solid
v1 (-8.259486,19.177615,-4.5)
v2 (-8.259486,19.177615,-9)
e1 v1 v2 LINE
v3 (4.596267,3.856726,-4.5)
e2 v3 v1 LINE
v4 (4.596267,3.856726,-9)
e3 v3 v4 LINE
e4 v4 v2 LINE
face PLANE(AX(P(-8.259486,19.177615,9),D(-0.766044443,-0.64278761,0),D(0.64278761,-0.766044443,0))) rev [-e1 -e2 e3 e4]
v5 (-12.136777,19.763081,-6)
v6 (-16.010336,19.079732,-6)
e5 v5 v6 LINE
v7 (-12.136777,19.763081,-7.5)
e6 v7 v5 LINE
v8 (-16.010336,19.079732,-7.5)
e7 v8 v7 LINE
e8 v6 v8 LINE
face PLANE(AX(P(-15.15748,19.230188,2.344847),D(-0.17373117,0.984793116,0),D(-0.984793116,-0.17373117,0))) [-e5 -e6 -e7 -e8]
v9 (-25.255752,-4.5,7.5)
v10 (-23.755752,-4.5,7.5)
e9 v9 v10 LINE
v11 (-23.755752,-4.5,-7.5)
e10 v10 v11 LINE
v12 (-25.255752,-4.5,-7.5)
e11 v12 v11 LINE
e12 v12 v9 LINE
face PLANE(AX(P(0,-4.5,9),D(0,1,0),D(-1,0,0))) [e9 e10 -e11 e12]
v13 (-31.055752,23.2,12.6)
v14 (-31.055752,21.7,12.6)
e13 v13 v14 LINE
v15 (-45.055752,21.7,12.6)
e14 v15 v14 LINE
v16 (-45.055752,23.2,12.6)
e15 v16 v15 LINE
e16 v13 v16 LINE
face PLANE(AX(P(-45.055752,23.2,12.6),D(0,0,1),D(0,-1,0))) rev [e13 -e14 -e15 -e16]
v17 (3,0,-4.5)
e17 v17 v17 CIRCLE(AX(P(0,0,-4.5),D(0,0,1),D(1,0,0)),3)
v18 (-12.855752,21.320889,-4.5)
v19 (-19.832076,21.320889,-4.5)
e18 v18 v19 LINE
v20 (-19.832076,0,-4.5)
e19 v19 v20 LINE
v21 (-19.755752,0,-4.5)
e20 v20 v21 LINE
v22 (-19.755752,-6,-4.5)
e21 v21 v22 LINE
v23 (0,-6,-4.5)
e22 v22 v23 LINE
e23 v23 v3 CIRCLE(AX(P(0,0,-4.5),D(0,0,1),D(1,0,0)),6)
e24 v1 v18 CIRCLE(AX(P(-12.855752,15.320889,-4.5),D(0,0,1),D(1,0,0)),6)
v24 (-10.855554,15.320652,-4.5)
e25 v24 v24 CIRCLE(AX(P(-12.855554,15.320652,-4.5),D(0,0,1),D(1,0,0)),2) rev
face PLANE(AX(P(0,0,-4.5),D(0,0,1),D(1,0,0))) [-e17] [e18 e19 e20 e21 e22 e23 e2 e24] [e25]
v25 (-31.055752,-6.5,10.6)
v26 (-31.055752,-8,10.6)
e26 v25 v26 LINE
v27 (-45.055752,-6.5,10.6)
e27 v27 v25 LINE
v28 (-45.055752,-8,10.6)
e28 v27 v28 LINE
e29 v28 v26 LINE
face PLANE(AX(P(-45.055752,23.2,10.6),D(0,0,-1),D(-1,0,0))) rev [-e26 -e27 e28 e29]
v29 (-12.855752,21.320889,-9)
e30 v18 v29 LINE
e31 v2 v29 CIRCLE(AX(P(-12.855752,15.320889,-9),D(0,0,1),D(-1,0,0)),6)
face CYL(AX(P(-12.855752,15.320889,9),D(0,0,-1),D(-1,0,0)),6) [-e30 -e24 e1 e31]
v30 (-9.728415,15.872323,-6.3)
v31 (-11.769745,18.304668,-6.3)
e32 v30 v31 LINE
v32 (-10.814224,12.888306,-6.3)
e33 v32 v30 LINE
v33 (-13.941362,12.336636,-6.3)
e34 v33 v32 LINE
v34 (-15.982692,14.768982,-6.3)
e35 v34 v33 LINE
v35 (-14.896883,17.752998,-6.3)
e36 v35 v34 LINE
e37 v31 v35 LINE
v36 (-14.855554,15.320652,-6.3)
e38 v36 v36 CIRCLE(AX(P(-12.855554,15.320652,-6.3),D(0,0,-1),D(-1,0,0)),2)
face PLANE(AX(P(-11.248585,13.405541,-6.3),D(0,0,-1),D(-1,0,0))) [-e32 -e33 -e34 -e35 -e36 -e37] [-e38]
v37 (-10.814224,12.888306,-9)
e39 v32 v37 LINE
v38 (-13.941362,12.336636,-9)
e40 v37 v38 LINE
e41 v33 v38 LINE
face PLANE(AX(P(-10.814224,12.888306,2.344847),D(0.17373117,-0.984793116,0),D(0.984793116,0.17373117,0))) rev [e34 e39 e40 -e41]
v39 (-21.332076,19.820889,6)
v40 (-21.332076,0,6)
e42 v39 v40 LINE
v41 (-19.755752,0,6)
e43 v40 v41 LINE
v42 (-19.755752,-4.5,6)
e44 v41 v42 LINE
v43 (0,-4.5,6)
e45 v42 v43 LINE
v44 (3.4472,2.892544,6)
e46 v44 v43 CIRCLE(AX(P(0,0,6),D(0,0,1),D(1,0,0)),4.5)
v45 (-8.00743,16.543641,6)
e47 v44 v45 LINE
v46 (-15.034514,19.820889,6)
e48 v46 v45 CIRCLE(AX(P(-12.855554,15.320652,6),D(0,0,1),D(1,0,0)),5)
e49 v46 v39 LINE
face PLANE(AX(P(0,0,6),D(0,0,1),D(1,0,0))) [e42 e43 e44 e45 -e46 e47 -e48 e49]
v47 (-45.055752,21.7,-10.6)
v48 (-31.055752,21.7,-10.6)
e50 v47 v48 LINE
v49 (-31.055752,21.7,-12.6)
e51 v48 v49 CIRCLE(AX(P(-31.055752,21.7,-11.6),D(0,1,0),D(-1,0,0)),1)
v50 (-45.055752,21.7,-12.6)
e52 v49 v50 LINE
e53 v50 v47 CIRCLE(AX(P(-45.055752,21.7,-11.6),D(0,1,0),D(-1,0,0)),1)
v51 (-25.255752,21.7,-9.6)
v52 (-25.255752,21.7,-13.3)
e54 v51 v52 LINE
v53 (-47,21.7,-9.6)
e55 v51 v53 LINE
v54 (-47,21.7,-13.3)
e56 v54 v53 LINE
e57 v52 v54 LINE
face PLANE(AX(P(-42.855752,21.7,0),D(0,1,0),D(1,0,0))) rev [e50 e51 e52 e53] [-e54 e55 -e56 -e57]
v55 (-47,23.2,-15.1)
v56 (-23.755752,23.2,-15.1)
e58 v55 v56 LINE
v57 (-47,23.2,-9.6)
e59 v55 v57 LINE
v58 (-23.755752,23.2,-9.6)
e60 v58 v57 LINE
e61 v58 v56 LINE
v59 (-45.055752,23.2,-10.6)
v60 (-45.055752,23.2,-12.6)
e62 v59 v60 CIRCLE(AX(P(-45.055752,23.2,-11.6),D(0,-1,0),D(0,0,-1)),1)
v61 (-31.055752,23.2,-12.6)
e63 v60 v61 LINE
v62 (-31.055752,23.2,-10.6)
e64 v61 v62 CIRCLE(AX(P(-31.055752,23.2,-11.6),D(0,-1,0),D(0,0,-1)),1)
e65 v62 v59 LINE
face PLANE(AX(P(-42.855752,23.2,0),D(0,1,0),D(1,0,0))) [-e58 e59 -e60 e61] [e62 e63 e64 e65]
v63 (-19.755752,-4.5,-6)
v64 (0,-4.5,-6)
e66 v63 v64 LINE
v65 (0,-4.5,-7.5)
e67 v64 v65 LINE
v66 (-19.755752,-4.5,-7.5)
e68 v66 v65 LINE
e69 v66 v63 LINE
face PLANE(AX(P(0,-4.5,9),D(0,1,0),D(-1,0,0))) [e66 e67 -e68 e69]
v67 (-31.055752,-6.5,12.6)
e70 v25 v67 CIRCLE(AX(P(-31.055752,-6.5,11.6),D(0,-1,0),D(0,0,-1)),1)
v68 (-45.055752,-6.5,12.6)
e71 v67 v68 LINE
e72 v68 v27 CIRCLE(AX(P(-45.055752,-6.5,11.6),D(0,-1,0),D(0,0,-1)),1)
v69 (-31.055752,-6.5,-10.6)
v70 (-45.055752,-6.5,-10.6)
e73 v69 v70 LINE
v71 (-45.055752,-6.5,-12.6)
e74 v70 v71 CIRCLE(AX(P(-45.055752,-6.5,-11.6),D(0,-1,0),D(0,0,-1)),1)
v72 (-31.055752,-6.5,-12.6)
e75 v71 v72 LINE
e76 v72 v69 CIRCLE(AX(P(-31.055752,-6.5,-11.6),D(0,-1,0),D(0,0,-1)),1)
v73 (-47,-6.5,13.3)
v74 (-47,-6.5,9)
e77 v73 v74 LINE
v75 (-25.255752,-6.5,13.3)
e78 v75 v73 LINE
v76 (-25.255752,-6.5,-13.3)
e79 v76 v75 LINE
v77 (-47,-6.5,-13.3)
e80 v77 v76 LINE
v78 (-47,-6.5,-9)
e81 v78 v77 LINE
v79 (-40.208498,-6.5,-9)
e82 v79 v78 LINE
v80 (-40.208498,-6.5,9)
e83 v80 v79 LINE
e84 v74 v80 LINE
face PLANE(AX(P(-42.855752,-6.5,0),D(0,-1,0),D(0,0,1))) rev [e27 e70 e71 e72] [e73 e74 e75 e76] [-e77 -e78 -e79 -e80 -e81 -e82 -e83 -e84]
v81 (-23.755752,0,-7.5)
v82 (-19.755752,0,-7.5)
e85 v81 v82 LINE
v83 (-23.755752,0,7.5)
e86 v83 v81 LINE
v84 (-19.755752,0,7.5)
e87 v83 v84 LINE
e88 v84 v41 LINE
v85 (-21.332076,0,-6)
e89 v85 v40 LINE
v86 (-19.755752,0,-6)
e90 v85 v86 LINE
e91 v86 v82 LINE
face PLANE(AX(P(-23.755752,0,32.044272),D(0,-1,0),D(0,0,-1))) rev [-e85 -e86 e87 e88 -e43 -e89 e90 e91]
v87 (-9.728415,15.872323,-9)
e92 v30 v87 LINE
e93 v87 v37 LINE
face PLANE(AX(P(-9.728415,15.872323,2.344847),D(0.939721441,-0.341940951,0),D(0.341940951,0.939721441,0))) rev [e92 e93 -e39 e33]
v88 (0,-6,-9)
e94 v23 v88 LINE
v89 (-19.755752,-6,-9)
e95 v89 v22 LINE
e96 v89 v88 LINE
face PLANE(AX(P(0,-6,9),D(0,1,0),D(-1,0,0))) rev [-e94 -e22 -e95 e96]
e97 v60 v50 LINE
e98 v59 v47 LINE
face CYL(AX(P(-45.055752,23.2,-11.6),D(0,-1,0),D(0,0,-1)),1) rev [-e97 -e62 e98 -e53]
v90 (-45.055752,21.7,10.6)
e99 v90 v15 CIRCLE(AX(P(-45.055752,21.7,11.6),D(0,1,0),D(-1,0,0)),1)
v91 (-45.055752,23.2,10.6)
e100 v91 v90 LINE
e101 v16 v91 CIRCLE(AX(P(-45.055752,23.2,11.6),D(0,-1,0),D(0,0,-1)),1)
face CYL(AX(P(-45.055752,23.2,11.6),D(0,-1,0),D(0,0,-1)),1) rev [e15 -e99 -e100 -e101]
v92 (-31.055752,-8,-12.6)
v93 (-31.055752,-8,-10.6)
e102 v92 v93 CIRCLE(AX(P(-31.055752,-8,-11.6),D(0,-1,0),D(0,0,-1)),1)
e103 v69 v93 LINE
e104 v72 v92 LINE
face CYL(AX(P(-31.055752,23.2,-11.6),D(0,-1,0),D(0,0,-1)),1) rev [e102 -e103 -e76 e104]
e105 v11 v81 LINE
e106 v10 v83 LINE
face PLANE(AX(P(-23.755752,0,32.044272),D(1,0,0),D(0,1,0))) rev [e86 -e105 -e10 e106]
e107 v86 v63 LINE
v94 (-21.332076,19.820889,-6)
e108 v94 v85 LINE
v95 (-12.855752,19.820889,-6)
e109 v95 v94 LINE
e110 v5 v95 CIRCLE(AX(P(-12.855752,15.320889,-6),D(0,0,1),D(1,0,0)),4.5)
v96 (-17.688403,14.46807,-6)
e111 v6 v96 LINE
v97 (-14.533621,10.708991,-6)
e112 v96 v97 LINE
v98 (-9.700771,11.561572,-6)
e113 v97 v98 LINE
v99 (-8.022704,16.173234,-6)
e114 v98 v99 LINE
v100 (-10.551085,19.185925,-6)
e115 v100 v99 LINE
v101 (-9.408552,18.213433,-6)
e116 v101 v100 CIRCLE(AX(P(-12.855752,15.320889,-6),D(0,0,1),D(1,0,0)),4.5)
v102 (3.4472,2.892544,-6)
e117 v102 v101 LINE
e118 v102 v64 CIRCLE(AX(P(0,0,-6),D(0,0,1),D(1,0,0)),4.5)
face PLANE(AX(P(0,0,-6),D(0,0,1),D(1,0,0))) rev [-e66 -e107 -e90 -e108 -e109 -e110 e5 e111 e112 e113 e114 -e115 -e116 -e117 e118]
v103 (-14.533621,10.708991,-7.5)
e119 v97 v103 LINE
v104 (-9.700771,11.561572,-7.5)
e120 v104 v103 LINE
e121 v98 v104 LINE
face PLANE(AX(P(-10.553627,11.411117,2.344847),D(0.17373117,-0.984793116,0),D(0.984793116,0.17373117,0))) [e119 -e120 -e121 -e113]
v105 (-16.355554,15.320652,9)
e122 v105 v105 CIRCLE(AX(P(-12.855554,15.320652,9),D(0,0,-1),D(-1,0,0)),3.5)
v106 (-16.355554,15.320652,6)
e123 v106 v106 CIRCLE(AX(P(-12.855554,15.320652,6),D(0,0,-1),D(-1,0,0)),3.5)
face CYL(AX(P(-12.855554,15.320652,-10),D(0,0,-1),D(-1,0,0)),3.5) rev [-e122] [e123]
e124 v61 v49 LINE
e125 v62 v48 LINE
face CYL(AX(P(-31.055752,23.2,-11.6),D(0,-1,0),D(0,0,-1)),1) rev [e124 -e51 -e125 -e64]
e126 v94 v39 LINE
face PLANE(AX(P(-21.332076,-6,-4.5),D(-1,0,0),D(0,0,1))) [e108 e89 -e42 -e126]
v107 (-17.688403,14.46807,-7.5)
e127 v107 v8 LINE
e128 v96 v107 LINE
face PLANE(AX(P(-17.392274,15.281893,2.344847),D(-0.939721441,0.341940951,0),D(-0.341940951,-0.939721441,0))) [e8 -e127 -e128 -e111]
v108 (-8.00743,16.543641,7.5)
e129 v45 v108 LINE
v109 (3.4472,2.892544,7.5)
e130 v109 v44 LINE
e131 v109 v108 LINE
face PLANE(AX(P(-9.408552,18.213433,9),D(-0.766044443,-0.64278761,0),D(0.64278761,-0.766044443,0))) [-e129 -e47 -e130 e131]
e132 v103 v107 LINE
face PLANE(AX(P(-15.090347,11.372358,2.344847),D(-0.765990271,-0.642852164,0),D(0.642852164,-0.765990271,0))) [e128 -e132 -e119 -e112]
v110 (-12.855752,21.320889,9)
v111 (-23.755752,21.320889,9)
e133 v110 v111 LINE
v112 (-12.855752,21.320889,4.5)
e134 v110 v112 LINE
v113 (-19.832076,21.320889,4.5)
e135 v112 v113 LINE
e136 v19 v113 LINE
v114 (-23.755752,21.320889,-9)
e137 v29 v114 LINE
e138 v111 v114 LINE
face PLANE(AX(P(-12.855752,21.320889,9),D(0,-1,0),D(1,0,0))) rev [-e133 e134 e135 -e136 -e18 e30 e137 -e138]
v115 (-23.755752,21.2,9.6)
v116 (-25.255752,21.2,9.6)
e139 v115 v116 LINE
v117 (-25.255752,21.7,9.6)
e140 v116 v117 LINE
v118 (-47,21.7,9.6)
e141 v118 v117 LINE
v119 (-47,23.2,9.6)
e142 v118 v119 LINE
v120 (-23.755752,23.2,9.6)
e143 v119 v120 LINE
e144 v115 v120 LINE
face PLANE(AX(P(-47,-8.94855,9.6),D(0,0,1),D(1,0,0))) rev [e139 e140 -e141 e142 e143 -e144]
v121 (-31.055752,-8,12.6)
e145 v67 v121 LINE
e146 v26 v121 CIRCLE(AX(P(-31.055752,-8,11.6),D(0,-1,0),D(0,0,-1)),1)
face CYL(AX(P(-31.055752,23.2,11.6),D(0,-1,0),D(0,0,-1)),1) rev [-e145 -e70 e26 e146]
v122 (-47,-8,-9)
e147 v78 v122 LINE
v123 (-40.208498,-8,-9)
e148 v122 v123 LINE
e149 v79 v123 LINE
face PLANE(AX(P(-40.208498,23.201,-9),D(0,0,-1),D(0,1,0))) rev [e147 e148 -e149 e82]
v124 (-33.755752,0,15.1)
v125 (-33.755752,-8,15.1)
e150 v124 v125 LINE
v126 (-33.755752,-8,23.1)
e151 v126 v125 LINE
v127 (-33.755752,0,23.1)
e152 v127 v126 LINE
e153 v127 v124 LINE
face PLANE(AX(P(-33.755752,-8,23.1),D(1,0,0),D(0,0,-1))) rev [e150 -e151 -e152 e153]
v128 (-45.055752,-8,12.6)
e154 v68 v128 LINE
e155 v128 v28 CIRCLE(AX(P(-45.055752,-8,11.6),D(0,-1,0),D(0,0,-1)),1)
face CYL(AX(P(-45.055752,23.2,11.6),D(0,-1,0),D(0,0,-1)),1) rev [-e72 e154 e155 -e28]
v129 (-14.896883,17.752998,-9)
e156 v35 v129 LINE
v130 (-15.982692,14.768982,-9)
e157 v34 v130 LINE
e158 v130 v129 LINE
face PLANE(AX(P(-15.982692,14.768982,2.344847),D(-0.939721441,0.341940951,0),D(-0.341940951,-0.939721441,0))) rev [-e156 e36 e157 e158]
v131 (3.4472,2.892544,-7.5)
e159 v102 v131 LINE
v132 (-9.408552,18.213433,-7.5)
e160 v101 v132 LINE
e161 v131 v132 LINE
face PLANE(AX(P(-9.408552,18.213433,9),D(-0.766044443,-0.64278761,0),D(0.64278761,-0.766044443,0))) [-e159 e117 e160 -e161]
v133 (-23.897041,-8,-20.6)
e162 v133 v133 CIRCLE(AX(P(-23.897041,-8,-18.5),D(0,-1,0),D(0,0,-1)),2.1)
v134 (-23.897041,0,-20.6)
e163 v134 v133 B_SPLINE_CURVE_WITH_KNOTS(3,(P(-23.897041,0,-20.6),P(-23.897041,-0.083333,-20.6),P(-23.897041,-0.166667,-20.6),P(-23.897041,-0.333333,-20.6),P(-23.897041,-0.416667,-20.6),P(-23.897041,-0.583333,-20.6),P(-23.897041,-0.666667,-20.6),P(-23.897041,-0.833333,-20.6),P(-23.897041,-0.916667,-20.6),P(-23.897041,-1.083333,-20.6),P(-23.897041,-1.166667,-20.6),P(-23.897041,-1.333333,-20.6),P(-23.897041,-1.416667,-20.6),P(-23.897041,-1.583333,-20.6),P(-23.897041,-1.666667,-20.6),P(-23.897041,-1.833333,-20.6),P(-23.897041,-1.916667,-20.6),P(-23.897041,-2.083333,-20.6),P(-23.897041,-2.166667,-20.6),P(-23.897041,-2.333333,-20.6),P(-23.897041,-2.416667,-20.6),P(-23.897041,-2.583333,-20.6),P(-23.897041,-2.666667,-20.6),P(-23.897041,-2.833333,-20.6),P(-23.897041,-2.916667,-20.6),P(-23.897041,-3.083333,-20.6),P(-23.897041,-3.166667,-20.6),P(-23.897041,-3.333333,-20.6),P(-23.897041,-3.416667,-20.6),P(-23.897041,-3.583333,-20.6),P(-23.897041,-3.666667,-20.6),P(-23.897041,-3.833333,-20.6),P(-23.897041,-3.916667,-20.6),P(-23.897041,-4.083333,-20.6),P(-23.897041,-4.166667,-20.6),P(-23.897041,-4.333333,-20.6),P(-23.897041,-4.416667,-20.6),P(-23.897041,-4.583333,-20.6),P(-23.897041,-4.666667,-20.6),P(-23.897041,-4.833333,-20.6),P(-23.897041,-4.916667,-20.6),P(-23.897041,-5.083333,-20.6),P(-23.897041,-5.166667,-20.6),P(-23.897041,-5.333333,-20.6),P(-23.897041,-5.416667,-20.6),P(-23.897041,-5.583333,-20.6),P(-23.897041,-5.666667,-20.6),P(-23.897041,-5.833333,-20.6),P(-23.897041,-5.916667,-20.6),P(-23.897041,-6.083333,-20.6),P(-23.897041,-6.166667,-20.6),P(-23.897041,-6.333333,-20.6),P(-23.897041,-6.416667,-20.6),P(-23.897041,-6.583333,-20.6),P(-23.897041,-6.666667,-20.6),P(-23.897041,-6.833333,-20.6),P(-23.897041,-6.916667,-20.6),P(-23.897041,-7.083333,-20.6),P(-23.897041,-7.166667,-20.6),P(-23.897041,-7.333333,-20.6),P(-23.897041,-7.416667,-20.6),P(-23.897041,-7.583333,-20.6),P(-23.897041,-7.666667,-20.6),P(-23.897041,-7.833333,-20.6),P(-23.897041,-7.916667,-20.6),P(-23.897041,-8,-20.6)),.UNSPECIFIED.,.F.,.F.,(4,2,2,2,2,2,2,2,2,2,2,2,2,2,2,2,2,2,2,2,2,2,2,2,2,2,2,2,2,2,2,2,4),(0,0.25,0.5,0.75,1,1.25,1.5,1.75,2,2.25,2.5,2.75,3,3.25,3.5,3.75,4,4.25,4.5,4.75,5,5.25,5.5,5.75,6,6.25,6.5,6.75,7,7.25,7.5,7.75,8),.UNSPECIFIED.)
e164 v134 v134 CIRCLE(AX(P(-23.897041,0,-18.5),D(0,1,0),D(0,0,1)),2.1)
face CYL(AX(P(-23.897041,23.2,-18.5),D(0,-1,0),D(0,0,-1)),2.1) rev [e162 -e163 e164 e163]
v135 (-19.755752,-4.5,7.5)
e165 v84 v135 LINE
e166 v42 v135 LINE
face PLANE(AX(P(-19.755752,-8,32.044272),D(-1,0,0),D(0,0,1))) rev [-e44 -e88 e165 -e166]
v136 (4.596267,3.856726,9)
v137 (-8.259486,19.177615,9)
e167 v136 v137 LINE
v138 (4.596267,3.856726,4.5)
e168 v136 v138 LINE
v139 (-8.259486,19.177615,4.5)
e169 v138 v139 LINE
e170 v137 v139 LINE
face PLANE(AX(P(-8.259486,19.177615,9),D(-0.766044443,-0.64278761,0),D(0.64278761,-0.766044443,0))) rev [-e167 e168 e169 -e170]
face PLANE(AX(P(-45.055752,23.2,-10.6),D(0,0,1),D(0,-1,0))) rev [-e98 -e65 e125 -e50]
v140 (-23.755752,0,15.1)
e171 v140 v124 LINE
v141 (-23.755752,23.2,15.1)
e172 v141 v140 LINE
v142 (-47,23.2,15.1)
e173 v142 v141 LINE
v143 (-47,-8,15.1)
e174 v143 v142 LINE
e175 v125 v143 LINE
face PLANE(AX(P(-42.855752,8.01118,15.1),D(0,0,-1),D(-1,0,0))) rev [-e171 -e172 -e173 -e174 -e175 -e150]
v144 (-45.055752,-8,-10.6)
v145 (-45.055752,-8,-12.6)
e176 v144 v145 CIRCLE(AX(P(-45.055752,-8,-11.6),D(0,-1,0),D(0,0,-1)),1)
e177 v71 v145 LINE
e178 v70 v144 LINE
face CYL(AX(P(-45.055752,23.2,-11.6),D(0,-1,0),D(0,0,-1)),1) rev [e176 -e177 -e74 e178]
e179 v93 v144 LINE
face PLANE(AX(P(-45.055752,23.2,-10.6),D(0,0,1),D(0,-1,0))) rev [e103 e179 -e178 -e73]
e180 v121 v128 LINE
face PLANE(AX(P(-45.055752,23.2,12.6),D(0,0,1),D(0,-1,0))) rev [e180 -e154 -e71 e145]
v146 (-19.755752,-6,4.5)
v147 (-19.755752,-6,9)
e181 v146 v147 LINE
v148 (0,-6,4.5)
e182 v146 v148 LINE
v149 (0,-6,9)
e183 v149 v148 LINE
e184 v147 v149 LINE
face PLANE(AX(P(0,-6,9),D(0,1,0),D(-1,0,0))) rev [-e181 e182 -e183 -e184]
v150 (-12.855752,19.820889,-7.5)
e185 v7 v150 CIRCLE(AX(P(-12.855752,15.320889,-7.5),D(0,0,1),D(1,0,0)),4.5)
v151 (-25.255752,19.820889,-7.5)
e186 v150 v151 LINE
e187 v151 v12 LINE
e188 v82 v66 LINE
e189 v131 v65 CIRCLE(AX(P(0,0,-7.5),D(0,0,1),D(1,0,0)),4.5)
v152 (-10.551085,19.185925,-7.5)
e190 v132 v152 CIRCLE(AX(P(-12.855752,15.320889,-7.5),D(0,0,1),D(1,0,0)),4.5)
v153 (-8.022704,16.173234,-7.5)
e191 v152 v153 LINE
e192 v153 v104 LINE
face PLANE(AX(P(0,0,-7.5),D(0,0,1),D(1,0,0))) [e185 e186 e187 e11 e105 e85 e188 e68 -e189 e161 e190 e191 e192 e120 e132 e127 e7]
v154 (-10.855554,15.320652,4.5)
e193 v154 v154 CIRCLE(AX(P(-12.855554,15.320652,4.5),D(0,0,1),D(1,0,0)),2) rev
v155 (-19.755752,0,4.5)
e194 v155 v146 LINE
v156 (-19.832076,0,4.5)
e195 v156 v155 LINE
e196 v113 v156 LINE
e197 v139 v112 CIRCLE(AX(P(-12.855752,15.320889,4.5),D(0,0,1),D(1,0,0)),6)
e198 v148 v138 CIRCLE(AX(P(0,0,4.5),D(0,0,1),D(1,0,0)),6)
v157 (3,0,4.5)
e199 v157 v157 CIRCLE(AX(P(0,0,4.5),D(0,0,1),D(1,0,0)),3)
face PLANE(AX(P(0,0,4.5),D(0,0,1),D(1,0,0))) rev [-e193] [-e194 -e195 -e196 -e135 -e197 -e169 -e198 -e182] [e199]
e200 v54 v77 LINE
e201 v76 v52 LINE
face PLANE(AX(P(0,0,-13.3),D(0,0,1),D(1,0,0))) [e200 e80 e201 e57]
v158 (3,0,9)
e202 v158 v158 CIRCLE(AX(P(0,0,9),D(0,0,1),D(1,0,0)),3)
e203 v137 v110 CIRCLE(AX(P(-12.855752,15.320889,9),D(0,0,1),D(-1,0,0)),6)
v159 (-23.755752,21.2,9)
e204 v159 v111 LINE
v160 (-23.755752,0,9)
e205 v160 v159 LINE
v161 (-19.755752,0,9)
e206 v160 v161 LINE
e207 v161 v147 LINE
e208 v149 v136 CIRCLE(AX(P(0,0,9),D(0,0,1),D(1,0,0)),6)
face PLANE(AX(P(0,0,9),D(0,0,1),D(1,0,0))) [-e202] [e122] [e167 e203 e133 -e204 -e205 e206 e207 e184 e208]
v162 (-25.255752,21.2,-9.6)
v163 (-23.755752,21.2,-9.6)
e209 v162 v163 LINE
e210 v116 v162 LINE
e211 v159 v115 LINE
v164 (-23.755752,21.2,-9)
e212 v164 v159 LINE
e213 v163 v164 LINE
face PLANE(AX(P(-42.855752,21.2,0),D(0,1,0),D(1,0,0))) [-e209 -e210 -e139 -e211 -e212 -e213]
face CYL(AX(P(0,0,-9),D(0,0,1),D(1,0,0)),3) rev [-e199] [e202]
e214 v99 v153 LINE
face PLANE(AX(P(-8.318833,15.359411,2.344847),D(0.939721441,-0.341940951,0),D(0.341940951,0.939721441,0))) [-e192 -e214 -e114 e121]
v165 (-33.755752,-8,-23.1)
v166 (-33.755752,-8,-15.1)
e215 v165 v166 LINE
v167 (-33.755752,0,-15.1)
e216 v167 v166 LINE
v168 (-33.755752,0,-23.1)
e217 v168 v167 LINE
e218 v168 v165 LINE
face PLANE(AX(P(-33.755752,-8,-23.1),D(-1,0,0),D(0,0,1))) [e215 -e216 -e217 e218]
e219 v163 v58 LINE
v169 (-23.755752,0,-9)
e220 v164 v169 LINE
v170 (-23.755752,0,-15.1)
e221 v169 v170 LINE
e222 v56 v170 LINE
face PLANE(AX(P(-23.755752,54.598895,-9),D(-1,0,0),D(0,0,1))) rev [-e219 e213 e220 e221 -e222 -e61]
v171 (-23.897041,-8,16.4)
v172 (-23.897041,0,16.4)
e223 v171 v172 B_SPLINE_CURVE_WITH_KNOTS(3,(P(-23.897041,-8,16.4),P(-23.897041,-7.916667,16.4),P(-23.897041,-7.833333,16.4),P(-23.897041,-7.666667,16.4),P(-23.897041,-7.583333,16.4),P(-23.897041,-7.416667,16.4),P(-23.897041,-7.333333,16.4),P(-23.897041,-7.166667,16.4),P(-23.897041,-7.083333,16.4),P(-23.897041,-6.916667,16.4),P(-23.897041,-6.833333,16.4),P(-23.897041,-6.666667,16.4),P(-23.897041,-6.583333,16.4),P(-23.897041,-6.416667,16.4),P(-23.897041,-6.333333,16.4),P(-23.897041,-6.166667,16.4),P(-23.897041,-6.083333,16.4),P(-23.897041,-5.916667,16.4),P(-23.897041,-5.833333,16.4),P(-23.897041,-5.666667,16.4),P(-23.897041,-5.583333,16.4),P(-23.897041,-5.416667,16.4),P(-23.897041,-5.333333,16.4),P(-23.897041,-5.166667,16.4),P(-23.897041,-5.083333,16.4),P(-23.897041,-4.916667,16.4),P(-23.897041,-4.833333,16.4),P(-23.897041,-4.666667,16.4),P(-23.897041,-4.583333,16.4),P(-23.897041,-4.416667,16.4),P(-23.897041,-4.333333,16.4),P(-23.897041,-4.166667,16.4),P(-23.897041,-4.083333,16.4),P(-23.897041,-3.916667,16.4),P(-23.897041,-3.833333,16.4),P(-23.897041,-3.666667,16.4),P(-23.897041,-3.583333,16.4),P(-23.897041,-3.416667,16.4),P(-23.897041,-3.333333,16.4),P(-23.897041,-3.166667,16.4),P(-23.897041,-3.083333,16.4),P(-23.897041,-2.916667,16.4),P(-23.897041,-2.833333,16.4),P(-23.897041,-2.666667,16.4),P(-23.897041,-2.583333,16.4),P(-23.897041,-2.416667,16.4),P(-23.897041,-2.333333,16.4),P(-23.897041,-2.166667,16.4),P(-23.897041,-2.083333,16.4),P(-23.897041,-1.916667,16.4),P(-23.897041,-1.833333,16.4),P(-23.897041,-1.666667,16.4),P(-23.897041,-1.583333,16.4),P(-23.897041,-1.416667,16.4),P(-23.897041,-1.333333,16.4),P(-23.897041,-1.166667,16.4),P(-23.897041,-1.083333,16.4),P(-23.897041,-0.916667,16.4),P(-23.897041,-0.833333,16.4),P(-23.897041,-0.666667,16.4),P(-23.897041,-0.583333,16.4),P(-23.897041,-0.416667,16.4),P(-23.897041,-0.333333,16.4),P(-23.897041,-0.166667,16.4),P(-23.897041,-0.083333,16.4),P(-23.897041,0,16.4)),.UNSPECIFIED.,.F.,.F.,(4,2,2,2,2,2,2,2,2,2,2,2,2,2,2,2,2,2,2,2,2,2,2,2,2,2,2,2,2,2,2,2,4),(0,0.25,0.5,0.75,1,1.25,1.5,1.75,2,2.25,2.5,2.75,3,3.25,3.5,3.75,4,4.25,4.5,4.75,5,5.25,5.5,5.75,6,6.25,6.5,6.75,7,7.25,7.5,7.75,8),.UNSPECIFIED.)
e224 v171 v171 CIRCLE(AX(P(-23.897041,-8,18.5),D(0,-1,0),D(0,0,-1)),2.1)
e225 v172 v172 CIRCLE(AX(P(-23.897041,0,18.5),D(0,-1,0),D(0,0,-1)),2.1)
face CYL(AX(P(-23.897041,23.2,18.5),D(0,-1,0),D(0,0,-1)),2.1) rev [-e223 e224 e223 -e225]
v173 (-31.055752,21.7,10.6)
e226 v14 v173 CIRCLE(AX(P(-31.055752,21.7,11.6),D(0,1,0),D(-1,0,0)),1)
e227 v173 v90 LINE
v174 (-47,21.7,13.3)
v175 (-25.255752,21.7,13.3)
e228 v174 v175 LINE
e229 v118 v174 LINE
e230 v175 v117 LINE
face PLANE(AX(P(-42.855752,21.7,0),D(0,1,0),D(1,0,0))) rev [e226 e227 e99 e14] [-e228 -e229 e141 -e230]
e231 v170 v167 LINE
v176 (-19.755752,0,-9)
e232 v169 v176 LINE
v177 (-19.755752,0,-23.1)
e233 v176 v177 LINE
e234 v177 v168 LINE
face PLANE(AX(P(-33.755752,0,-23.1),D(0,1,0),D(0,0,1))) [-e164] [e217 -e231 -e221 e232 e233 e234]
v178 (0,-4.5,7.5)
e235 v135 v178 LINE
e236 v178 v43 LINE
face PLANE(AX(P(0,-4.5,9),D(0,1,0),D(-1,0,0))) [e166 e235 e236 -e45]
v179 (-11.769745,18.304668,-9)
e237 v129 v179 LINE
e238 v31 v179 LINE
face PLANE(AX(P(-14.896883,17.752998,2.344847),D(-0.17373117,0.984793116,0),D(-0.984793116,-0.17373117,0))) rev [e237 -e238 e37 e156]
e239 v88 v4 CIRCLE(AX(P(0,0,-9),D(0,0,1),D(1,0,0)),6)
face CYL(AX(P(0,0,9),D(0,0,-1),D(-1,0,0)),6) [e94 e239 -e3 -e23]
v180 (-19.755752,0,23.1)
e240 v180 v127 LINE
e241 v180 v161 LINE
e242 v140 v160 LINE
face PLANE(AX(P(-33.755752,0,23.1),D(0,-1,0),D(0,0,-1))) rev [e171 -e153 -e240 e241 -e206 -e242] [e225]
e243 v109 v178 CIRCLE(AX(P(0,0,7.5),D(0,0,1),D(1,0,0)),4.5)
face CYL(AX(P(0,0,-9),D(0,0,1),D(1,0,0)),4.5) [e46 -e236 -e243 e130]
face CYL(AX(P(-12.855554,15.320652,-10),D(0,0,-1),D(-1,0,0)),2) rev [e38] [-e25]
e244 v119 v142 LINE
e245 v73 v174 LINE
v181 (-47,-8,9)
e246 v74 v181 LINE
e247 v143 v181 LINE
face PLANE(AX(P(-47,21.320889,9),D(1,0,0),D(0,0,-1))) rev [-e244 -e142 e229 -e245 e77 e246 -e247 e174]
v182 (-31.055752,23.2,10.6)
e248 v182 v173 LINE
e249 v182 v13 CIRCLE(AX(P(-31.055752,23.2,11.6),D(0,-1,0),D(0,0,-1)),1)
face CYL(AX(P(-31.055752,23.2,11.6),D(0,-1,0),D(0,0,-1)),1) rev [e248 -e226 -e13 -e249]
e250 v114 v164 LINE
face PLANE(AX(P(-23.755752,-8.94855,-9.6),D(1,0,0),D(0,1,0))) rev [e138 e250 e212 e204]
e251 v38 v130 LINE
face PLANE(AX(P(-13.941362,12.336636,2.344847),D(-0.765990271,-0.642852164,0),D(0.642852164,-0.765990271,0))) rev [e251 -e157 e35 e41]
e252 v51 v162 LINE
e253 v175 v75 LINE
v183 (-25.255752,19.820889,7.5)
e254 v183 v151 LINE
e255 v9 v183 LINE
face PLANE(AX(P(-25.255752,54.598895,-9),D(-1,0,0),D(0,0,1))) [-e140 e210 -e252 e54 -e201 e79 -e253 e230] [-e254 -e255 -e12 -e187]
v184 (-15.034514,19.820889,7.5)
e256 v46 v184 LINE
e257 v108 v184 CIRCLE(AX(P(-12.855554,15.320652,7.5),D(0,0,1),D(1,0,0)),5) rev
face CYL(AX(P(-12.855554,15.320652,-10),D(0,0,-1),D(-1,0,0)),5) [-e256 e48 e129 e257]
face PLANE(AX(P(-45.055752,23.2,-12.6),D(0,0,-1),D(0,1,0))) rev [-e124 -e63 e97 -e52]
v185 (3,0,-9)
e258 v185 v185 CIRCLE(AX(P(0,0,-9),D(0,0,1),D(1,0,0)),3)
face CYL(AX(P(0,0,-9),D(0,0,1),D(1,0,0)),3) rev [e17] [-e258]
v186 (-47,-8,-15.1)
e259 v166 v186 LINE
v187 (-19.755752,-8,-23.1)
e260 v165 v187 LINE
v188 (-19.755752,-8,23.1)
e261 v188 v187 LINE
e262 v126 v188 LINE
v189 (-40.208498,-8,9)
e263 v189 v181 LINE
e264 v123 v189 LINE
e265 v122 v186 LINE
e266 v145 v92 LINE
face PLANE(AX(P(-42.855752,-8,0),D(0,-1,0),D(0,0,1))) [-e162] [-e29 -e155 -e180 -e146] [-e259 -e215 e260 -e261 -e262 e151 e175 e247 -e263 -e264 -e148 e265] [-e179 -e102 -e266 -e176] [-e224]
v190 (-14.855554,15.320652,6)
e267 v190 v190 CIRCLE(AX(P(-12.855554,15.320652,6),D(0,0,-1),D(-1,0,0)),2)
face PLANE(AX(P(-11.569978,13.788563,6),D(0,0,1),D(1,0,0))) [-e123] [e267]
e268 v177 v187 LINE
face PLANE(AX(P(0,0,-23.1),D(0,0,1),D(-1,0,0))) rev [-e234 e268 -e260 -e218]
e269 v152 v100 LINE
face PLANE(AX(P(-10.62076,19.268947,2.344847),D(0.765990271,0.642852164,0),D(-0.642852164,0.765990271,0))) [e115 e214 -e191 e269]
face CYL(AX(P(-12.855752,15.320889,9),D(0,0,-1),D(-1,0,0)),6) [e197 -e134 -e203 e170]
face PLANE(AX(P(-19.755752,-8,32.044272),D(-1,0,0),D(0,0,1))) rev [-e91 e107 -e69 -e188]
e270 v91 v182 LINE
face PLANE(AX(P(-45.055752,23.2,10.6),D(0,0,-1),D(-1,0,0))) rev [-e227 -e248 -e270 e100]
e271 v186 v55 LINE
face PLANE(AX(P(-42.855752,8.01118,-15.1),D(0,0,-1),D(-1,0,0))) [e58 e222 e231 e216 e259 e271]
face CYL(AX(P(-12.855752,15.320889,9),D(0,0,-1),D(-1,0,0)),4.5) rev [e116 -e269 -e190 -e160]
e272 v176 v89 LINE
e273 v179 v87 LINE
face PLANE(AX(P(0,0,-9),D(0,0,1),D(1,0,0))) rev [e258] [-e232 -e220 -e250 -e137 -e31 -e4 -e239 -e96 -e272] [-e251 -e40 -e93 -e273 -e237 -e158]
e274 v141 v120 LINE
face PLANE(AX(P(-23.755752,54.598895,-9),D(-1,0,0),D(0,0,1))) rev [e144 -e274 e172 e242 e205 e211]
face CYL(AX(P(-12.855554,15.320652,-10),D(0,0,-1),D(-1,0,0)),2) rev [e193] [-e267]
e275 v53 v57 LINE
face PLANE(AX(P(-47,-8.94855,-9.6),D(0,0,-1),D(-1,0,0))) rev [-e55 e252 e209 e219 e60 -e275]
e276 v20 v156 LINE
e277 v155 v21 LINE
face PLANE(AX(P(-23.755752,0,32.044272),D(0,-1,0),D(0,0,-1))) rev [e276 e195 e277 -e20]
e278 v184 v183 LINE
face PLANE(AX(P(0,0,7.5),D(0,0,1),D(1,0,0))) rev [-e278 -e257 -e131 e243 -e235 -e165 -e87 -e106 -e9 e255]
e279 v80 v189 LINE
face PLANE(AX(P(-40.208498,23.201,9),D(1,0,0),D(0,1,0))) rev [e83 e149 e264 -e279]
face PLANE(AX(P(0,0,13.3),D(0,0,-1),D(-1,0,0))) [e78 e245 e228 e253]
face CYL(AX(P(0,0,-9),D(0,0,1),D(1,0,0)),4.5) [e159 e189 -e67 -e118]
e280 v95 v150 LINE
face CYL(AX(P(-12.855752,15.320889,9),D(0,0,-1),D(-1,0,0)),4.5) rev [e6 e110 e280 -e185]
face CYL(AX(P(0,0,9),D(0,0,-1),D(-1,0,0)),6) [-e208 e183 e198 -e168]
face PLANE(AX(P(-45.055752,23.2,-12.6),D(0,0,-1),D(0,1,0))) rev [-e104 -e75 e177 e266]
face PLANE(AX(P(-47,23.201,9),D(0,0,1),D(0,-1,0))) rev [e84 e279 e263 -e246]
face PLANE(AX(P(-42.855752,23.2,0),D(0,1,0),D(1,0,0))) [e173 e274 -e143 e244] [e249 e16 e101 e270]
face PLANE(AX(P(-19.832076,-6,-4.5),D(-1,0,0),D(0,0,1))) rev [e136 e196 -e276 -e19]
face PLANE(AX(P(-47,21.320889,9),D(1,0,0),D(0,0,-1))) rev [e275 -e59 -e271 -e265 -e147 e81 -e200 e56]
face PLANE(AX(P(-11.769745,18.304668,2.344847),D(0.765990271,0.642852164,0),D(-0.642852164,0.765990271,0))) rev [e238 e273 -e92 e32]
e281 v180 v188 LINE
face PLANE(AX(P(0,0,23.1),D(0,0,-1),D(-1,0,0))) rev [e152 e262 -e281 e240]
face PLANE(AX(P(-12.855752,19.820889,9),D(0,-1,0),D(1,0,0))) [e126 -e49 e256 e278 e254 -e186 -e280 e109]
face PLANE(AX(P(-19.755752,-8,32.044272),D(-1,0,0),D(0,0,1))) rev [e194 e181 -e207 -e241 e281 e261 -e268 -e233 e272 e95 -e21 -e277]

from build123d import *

# Parameters (mm, degrees)
EXTRUDE_1_DEPTH             = 9
SKETCH_2_W                  = 27.565905012
SKETCH_2_H                  = 27.320888862
CUT_EXTRUDE_1_DEPTH         = 4.5
CUT_EXTRUDE_2_DEPTH         = 2.7
SKETCH_5_R                  = 3
CUT_EXTRUDE_3_DEPTH         = 55.658762352
SKETCH_8_W                  = 23.244247806
SKETCH_8_H                  = 18
EXTRUDE_2_DEPTH             = 1.879111138
SKETCH_9_W                  = 23.244247806
SKETCH_9_H                  = 18
EXTRUDE_3_DEPTH             = 2
SKETCH_10_W                 = 23.244247806
SKETCH_10_H                 = 31.2
EXTRUDE_4_DEPTH             = 6.1
SKETCH_11_W                 = 23.244247806
SKETCH_11_H                 = 31.2
EXTRUDE_5_DEPTH             = 6.1
SHELL_START                 = -13.6
SHELL_2_OUTLINE_W           = 21.744247806
SHELL_2_OUTLINE_H           = 28.2
SHELL_2_DEPTH               = 27.2
SHELL_START_2               = -7.5
SHELL_2_2_OUTLINE_W         = 3.923676383
SHELL_2_2_OUTLINE_H         = 24.320888862
SHELL_2_2_DEPTH             = 15
SHELL_2_3_DEPTH             = 1.5
SHELL_START_3               = 6
SHELL_2_4_DEPTH             = 1.5
CUT_EXTRUDE_4_DEPTH         = 59.399058212
CUT_EXTRUDE_START           = -2
SKETCH_13_W                 = 23.244247806
SKETCH_13_H                 = 19.2
CUT_EXTRUDE_5_DEPTH         = 2
SKETCH_15_W                 = 10
SKETCH_15_H                 = 8
EXTRUDE_6_DEPTH             = 8
EXTRUDE_7_REACH             = 59.279
SKETCH_19_W                 = 4
SKETCH_19_H                 = 8
EXTRUDE_7_DIRECTION_2_REACH = 59.279
SKETCH_17_R                 = 2.1
CUT_EXTRUDE_6_DEPTH         = 61.959412727
SKETCH_20_W                 = 21.744247806
SKETCH_20_H                 = 28.2
EXTRUDE_8_DEPTH             = 0.3
SKETCH_21_W                 = 21.744247806
SKETCH_21_H                 = 28.2
EXTRUDE_9_DEPTH             = 0.3
CUT_EXTRUDE_7_REACH         = 62.959
SKETCH_22_W                 = 6.791501739
SKETCH_22_H                 = 18


# Read off the part's stored shape, not the designer's step: 抽壳2
with BuildPart() as part:
    # 草图1 → 凸台-拉伸1 (new, symmetric)
    with BuildSketch(Plane.XY):
        with BuildLine():
            Line((-8.259485535, 19.17761452), (4.596266659, 3.856725658))
            ThreePointArc((4.596266659, 3.856725658), (5.437846722, -2.53570957), (0, -6))
            Line((0, -6), (-47, -6))
            Line((-47, -6), (-47, 21.320888862))
            Line((-47, 21.320888862), (-12.855752194, 21.320888862))
            ThreePointArc((-12.855752194, 21.320888862), (-10.320042623, 20.758735585), (-8.259485535, 19.17761452))
        make_face()
    extrude(amount=EXTRUDE_1_DEPTH, both=True)

    # 草图2 → 切除-拉伸1 (cut, symmetric)
    with BuildSketch(Plane.XY):
        with Locations((-6.049123305, 7.660444431)):
            Rectangle(SKETCH_2_W, SKETCH_2_H)
    extrude(amount=CUT_EXTRUDE_1_DEPTH, both=True, mode=Mode.SUBTRACT)

    # 草图3 → 切除-旋转1 (revolve, cut)
    with BuildSketch(Plane(origin=(0, 0, 0), x_dir=(-0.642787609686538, 0.7660444431189792, 0), z_dir=(0.7660444431189791, 0.6427876096865379, 0)), mode=Mode.PRIVATE) as cut_revolve_1_sk:
        Polygon((19.999690983, -9), (17.499690983, -9), (17.499690983, -6.3), (17.999690983, -6.3), (17.999690983, 6), (16.499690983, 6), (16.499690983, 9), (19.999690983, 9), align=None)
    revolve(cut_revolve_1_sk.sketch.rotate(Axis((-12.855553561, 15.320652142, -10), (0, 0, 1)), 230), axis=Axis((-12.855553561, 15.320652142, -10), (0, 0, 1)), mode=Mode.SUBTRACT)

    # 草图4 → 切除-拉伸2 (cut)
    with BuildSketch(Plane(origin=(0, 0, -9), x_dir=(-1, 0, 0), z_dir=(0, 0, -1))):
        Polygon((11.76974521, 18.304668488), (9.728415424, 15.872322699), (10.814223775, 12.888306353), (13.941361912, 12.336635795), (15.982691699, 14.768981584), (14.896883348, 17.752997931), align=None)
    extrude(amount=-CUT_EXTRUDE_2_DEPTH, mode=Mode.SUBTRACT)

    # 草图5 → 切除-拉伸3 (cut, through all)
    with BuildSketch(Plane.XY.offset(9)):
        Circle(SKETCH_5_R)
    extrude(amount=-CUT_EXTRUDE_3_DEPTH, mode=Mode.SUBTRACT)

    # 草图8 → 凸台-拉伸2 (add)
    with BuildSketch(Plane(origin=(0, 21.320888862, 0), x_dir=(1, 0, 0), z_dir=(0, 1, 0))):
        with Locations((-35.377876097, 0)):
            Rectangle(SKETCH_8_W, SKETCH_8_H)
    extrude(amount=EXTRUDE_2_DEPTH)

    # 草图9 → 凸台-拉伸3 (add)
    with BuildSketch(Plane.XZ.offset(6)):
        with Locations((-35.377876097, 0)):
            Rectangle(SKETCH_9_W, SKETCH_9_H)
    extrude(amount=EXTRUDE_3_DEPTH)

    # 草图10 → 凸台-拉伸4 (add)
    with BuildSketch(Plane.XY.offset(9)):
        with Locations((-35.377876097, 7.6)):
            Rectangle(SKETCH_10_W, SKETCH_10_H)
    extrude(amount=EXTRUDE_4_DEPTH)

    # 草图11 → 凸台-拉伸5 (add)
    with BuildSketch(Plane(origin=(0, 0, -9), x_dir=(-1, 0, 0), z_dir=(0, 0, -1))):
        with Locations((35.377876097, 7.6)):
            Rectangle(SKETCH_11_W, SKETCH_11_H)
    extrude(amount=EXTRUDE_5_DEPTH)

    # 抽壳2 outline → 抽壳2 (cut)
    with BuildSketch(Plane.XY.offset(SHELL_START)):
        with Locations((-36.127876097, 7.6)):
            Rectangle(SHELL_2_OUTLINE_W, SHELL_2_OUTLINE_H)
    extrude(amount=SHELL_2_DEPTH, mode=Mode.SUBTRACT)

    # Shell 2 2 outline → Shell 2 2 (cut)
    with BuildSketch(Plane.XY.offset(SHELL_START_2)):
        with Locations((-23.293914003, 7.660444431)):
            Rectangle(SHELL_2_2_OUTLINE_W, SHELL_2_2_OUTLINE_H)
    extrude(amount=SHELL_2_2_DEPTH, mode=Mode.SUBTRACT)

    # Shell 2 3 outline → Shell 2 3 (cut)
    with BuildSketch(Plane.XY.offset(SHELL_START_2)):
        with BuildLine():
            Line((-9.700771165, 11.561572286), (-14.533621013, 10.708990515))
            Line((-14.533621013, 10.708990515), (-17.68840341, 14.46807037))
            Line((-17.68840341, 14.46807037), (-16.010335958, 19.079731997))
            Line((-16.010335958, 19.079731997), (-12.136777385, 19.763081477))
            ThreePointArc((-12.136777385, 19.763081477), (-12.495104697, 19.806413735), (-12.855752194, 19.820888862))
            Line((-12.855752194, 19.820888862), (-21.332075811, 19.820888862))
            Line((-21.332075811, 19.820888862), (-21.332075811, -4.5))
            Line((-21.332075811, -4.5), (0, -4.5))
            ThreePointArc((0, -4.5), (-4.078385042, 1.901782178), (3.447199994, 2.892544244))
            Line((3.447199994, 2.892544244), (-9.4085522, 18.213433106))
            ThreePointArc((-9.4085522, 18.213433106), (-9.939002288, 18.747632212), (-10.551084785, 19.18592549))
            Line((-10.551084785, 19.18592549), (-8.022703713, 16.173233913))
            Line((-8.022703713, 16.173233913), (-9.700771165, 11.561572286))
        make_face()
    extrude(amount=SHELL_2_3_DEPTH, mode=Mode.SUBTRACT)

    # Shell 2 4 outline → Shell 2 4 (cut)
    with BuildSketch(Plane.XY.offset(SHELL_START_3)):
        with BuildLine():
            Line((3.447199994, 2.892544244), (-8.007430451, 16.543641228))
            ThreePointArc((-8.007430451, 16.543641228), (-14.968890991, 10.789227983), (-15.034514198, 19.820888862))
            Line((-15.034514198, 19.820888862), (-21.332075811, 19.820888862))
            Line((-21.332075811, 19.820888862), (-21.332075811, -4.5))
            Line((-21.332075811, -4.5), (0, -4.5))
            ThreePointArc((0, -4.5), (-4.078385042, 1.901782178), (3.447199994, 2.892544244))
        make_face()
    extrude(amount=SHELL_2_4_DEPTH, mode=Mode.SUBTRACT)

    # 草图12 → 切除-拉伸4 (cut, through all)
    with BuildSketch(Plane.XZ.offset(8)):
        with BuildLine():
            Line((-45.055752194, 12.6), (-31.055752194, 12.6))
            ThreePointArc((-31.055752194, 12.6), (-30.055752194, 11.6), (-31.055752194, 10.6))
            Line((-31.055752194, 10.6), (-45.055752194, 10.6))
            ThreePointArc((-45.055752194, 10.6), (-46.055752194, 11.6), (-45.055752194, 12.6))
        make_face()
        with BuildLine():
            Line((-45.055752194, -10.6), (-31.055752194, -10.6))
            ThreePointArc((-31.055752194, -10.6), (-30.055752194, -11.6), (-31.055752194, -12.6))
            Line((-31.055752194, -12.6), (-45.055752194, -12.6))
            ThreePointArc((-45.055752194, -12.6), (-46.055752194, -11.6), (-45.055752194, -10.6))
        make_face()
    extrude(amount=-CUT_EXTRUDE_4_DEPTH, mode=Mode.SUBTRACT)

    # 草图13 → 切除-拉伸5 (cut)
    with BuildSketch(Plane(origin=(0, 23.2, 0), x_dir=(1, 0, 0), z_dir=(0, 1, 0)).offset(CUT_EXTRUDE_START)):
        with Locations((-35.377876097, 0)):
            Rectangle(SKETCH_13_W, SKETCH_13_H)
    extrude(amount=CUT_EXTRUDE_5_DEPTH, mode=Mode.SUBTRACT)

    # 草图15 → 凸台-拉伸6 (add)
    with BuildSketch(Plane.XY.offset(15.1)):
        with Locations((-28.755752194, -4)):
            Rectangle(SKETCH_15_W, SKETCH_15_H)
    extrude_6 = extrude(amount=EXTRUDE_6_DEPTH)

    # 镜向1: 凸台-拉伸6 across plane
    add(extrude_6.mirror(Plane.XY))

    # 凸台-拉伸7: up to this face of the body (flat: up to its plane)
    extrude_7_end = Plane(part.part.faces().sort_by_distance((-28.755752194, -4, 23.1))[0])
    # 草图19 → 凸台-拉伸7 (add, up to the picked face)
    with BuildSketch(Plane.XY, mode=Mode.PRIVATE) as extrude_7_sk1:
        with Locations((-21.755752194, -4)):
            Rectangle(SKETCH_19_W, SKETCH_19_H)
    extrude_7_tool1 = split(extrude(extrude_7_sk1.sketch, amount=EXTRUDE_7_REACH, mode=Mode.PRIVATE), bisect_by=extrude_7_end, keep=Keep.BOTH, mode=Mode.PRIVATE)
    add(extrude_7_tool1.solids().sort_by(Axis((-21.755752, -4, 0), (0, 0, 1)))[0])

    # 凸台-拉伸7 direction 2: up to this face of the body (flat: up to its plane)
    extrude_7_direction_2_end = Plane(part.part.faces().sort_by_distance((-28.755752194, -4, -23.1))[0])
    # 草图19 → 凸台-拉伸7 direction 2 (add, up to the picked face)
    with BuildSketch(Plane.XY, mode=Mode.PRIVATE) as extrude_7_direction_2_sk1:
        with Locations((-21.755752194, -4)):
            Rectangle(SKETCH_19_W, SKETCH_19_H)
    extrude_7_direction_2_tool1 = split(extrude(extrude_7_direction_2_sk1.sketch, amount=-EXTRUDE_7_DIRECTION_2_REACH, mode=Mode.PRIVATE), bisect_by=extrude_7_direction_2_end, keep=Keep.BOTH, mode=Mode.PRIVATE)
    add(extrude_7_direction_2_tool1.solids().sort_by(Axis((-21.755752, -4, 0), (0, 0, -1)))[0])

    # 草图17 → 切除-拉伸6 (cut, through all)
    with BuildSketch(Plane.XZ.offset(8)):
        with Locations(Location((-23.897040888, 18.5, 0), (0, 0, 270))):
            Circle(SKETCH_17_R)
        with Locations(Location((-23.897040888, -18.5, 0), (0, 0, 270))):
            Circle(SKETCH_17_R)
    extrude(amount=-CUT_EXTRUDE_6_DEPTH, mode=Mode.SUBTRACT)

    # 草图20 → 凸台-拉伸8 (add)
    with BuildSketch(Plane.XY.offset(-13.6)):
        with Locations((-36.127876097, 7.6)):
            Rectangle(SKETCH_20_W, SKETCH_20_H)
    extrude(amount=EXTRUDE_8_DEPTH)

    # 草图21 → 凸台-拉伸9 (add)
    with BuildSketch(Plane(origin=(0, 0, 13.6), x_dir=(-1, 0, 0), z_dir=(0, 0, -1))):
        with Locations((36.127876097, 7.6)):
            Rectangle(SKETCH_21_W, SKETCH_21_H)
    extrude(amount=EXTRUDE_9_DEPTH)

    # 草图22 → 切除-拉伸7 (cut, up to next)
    with BuildSketch(Plane.XZ.offset(8), mode=Mode.PRIVATE) as cut_extrude_7_sk1:
        with Locations((-43.604249131, 0)):
            Rectangle(SKETCH_22_W, SKETCH_22_H)
    cut_extrude_7_tool1 = extrude(cut_extrude_7_sk1.sketch, amount=-CUT_EXTRUDE_7_REACH, mode=Mode.PRIVATE) & part.part
    add(cut_extrude_7_tool1.solids().sort_by_distance((-43.604249, -8, 0))[0], mode=Mode.SUBTRACT)


solid = part.part
